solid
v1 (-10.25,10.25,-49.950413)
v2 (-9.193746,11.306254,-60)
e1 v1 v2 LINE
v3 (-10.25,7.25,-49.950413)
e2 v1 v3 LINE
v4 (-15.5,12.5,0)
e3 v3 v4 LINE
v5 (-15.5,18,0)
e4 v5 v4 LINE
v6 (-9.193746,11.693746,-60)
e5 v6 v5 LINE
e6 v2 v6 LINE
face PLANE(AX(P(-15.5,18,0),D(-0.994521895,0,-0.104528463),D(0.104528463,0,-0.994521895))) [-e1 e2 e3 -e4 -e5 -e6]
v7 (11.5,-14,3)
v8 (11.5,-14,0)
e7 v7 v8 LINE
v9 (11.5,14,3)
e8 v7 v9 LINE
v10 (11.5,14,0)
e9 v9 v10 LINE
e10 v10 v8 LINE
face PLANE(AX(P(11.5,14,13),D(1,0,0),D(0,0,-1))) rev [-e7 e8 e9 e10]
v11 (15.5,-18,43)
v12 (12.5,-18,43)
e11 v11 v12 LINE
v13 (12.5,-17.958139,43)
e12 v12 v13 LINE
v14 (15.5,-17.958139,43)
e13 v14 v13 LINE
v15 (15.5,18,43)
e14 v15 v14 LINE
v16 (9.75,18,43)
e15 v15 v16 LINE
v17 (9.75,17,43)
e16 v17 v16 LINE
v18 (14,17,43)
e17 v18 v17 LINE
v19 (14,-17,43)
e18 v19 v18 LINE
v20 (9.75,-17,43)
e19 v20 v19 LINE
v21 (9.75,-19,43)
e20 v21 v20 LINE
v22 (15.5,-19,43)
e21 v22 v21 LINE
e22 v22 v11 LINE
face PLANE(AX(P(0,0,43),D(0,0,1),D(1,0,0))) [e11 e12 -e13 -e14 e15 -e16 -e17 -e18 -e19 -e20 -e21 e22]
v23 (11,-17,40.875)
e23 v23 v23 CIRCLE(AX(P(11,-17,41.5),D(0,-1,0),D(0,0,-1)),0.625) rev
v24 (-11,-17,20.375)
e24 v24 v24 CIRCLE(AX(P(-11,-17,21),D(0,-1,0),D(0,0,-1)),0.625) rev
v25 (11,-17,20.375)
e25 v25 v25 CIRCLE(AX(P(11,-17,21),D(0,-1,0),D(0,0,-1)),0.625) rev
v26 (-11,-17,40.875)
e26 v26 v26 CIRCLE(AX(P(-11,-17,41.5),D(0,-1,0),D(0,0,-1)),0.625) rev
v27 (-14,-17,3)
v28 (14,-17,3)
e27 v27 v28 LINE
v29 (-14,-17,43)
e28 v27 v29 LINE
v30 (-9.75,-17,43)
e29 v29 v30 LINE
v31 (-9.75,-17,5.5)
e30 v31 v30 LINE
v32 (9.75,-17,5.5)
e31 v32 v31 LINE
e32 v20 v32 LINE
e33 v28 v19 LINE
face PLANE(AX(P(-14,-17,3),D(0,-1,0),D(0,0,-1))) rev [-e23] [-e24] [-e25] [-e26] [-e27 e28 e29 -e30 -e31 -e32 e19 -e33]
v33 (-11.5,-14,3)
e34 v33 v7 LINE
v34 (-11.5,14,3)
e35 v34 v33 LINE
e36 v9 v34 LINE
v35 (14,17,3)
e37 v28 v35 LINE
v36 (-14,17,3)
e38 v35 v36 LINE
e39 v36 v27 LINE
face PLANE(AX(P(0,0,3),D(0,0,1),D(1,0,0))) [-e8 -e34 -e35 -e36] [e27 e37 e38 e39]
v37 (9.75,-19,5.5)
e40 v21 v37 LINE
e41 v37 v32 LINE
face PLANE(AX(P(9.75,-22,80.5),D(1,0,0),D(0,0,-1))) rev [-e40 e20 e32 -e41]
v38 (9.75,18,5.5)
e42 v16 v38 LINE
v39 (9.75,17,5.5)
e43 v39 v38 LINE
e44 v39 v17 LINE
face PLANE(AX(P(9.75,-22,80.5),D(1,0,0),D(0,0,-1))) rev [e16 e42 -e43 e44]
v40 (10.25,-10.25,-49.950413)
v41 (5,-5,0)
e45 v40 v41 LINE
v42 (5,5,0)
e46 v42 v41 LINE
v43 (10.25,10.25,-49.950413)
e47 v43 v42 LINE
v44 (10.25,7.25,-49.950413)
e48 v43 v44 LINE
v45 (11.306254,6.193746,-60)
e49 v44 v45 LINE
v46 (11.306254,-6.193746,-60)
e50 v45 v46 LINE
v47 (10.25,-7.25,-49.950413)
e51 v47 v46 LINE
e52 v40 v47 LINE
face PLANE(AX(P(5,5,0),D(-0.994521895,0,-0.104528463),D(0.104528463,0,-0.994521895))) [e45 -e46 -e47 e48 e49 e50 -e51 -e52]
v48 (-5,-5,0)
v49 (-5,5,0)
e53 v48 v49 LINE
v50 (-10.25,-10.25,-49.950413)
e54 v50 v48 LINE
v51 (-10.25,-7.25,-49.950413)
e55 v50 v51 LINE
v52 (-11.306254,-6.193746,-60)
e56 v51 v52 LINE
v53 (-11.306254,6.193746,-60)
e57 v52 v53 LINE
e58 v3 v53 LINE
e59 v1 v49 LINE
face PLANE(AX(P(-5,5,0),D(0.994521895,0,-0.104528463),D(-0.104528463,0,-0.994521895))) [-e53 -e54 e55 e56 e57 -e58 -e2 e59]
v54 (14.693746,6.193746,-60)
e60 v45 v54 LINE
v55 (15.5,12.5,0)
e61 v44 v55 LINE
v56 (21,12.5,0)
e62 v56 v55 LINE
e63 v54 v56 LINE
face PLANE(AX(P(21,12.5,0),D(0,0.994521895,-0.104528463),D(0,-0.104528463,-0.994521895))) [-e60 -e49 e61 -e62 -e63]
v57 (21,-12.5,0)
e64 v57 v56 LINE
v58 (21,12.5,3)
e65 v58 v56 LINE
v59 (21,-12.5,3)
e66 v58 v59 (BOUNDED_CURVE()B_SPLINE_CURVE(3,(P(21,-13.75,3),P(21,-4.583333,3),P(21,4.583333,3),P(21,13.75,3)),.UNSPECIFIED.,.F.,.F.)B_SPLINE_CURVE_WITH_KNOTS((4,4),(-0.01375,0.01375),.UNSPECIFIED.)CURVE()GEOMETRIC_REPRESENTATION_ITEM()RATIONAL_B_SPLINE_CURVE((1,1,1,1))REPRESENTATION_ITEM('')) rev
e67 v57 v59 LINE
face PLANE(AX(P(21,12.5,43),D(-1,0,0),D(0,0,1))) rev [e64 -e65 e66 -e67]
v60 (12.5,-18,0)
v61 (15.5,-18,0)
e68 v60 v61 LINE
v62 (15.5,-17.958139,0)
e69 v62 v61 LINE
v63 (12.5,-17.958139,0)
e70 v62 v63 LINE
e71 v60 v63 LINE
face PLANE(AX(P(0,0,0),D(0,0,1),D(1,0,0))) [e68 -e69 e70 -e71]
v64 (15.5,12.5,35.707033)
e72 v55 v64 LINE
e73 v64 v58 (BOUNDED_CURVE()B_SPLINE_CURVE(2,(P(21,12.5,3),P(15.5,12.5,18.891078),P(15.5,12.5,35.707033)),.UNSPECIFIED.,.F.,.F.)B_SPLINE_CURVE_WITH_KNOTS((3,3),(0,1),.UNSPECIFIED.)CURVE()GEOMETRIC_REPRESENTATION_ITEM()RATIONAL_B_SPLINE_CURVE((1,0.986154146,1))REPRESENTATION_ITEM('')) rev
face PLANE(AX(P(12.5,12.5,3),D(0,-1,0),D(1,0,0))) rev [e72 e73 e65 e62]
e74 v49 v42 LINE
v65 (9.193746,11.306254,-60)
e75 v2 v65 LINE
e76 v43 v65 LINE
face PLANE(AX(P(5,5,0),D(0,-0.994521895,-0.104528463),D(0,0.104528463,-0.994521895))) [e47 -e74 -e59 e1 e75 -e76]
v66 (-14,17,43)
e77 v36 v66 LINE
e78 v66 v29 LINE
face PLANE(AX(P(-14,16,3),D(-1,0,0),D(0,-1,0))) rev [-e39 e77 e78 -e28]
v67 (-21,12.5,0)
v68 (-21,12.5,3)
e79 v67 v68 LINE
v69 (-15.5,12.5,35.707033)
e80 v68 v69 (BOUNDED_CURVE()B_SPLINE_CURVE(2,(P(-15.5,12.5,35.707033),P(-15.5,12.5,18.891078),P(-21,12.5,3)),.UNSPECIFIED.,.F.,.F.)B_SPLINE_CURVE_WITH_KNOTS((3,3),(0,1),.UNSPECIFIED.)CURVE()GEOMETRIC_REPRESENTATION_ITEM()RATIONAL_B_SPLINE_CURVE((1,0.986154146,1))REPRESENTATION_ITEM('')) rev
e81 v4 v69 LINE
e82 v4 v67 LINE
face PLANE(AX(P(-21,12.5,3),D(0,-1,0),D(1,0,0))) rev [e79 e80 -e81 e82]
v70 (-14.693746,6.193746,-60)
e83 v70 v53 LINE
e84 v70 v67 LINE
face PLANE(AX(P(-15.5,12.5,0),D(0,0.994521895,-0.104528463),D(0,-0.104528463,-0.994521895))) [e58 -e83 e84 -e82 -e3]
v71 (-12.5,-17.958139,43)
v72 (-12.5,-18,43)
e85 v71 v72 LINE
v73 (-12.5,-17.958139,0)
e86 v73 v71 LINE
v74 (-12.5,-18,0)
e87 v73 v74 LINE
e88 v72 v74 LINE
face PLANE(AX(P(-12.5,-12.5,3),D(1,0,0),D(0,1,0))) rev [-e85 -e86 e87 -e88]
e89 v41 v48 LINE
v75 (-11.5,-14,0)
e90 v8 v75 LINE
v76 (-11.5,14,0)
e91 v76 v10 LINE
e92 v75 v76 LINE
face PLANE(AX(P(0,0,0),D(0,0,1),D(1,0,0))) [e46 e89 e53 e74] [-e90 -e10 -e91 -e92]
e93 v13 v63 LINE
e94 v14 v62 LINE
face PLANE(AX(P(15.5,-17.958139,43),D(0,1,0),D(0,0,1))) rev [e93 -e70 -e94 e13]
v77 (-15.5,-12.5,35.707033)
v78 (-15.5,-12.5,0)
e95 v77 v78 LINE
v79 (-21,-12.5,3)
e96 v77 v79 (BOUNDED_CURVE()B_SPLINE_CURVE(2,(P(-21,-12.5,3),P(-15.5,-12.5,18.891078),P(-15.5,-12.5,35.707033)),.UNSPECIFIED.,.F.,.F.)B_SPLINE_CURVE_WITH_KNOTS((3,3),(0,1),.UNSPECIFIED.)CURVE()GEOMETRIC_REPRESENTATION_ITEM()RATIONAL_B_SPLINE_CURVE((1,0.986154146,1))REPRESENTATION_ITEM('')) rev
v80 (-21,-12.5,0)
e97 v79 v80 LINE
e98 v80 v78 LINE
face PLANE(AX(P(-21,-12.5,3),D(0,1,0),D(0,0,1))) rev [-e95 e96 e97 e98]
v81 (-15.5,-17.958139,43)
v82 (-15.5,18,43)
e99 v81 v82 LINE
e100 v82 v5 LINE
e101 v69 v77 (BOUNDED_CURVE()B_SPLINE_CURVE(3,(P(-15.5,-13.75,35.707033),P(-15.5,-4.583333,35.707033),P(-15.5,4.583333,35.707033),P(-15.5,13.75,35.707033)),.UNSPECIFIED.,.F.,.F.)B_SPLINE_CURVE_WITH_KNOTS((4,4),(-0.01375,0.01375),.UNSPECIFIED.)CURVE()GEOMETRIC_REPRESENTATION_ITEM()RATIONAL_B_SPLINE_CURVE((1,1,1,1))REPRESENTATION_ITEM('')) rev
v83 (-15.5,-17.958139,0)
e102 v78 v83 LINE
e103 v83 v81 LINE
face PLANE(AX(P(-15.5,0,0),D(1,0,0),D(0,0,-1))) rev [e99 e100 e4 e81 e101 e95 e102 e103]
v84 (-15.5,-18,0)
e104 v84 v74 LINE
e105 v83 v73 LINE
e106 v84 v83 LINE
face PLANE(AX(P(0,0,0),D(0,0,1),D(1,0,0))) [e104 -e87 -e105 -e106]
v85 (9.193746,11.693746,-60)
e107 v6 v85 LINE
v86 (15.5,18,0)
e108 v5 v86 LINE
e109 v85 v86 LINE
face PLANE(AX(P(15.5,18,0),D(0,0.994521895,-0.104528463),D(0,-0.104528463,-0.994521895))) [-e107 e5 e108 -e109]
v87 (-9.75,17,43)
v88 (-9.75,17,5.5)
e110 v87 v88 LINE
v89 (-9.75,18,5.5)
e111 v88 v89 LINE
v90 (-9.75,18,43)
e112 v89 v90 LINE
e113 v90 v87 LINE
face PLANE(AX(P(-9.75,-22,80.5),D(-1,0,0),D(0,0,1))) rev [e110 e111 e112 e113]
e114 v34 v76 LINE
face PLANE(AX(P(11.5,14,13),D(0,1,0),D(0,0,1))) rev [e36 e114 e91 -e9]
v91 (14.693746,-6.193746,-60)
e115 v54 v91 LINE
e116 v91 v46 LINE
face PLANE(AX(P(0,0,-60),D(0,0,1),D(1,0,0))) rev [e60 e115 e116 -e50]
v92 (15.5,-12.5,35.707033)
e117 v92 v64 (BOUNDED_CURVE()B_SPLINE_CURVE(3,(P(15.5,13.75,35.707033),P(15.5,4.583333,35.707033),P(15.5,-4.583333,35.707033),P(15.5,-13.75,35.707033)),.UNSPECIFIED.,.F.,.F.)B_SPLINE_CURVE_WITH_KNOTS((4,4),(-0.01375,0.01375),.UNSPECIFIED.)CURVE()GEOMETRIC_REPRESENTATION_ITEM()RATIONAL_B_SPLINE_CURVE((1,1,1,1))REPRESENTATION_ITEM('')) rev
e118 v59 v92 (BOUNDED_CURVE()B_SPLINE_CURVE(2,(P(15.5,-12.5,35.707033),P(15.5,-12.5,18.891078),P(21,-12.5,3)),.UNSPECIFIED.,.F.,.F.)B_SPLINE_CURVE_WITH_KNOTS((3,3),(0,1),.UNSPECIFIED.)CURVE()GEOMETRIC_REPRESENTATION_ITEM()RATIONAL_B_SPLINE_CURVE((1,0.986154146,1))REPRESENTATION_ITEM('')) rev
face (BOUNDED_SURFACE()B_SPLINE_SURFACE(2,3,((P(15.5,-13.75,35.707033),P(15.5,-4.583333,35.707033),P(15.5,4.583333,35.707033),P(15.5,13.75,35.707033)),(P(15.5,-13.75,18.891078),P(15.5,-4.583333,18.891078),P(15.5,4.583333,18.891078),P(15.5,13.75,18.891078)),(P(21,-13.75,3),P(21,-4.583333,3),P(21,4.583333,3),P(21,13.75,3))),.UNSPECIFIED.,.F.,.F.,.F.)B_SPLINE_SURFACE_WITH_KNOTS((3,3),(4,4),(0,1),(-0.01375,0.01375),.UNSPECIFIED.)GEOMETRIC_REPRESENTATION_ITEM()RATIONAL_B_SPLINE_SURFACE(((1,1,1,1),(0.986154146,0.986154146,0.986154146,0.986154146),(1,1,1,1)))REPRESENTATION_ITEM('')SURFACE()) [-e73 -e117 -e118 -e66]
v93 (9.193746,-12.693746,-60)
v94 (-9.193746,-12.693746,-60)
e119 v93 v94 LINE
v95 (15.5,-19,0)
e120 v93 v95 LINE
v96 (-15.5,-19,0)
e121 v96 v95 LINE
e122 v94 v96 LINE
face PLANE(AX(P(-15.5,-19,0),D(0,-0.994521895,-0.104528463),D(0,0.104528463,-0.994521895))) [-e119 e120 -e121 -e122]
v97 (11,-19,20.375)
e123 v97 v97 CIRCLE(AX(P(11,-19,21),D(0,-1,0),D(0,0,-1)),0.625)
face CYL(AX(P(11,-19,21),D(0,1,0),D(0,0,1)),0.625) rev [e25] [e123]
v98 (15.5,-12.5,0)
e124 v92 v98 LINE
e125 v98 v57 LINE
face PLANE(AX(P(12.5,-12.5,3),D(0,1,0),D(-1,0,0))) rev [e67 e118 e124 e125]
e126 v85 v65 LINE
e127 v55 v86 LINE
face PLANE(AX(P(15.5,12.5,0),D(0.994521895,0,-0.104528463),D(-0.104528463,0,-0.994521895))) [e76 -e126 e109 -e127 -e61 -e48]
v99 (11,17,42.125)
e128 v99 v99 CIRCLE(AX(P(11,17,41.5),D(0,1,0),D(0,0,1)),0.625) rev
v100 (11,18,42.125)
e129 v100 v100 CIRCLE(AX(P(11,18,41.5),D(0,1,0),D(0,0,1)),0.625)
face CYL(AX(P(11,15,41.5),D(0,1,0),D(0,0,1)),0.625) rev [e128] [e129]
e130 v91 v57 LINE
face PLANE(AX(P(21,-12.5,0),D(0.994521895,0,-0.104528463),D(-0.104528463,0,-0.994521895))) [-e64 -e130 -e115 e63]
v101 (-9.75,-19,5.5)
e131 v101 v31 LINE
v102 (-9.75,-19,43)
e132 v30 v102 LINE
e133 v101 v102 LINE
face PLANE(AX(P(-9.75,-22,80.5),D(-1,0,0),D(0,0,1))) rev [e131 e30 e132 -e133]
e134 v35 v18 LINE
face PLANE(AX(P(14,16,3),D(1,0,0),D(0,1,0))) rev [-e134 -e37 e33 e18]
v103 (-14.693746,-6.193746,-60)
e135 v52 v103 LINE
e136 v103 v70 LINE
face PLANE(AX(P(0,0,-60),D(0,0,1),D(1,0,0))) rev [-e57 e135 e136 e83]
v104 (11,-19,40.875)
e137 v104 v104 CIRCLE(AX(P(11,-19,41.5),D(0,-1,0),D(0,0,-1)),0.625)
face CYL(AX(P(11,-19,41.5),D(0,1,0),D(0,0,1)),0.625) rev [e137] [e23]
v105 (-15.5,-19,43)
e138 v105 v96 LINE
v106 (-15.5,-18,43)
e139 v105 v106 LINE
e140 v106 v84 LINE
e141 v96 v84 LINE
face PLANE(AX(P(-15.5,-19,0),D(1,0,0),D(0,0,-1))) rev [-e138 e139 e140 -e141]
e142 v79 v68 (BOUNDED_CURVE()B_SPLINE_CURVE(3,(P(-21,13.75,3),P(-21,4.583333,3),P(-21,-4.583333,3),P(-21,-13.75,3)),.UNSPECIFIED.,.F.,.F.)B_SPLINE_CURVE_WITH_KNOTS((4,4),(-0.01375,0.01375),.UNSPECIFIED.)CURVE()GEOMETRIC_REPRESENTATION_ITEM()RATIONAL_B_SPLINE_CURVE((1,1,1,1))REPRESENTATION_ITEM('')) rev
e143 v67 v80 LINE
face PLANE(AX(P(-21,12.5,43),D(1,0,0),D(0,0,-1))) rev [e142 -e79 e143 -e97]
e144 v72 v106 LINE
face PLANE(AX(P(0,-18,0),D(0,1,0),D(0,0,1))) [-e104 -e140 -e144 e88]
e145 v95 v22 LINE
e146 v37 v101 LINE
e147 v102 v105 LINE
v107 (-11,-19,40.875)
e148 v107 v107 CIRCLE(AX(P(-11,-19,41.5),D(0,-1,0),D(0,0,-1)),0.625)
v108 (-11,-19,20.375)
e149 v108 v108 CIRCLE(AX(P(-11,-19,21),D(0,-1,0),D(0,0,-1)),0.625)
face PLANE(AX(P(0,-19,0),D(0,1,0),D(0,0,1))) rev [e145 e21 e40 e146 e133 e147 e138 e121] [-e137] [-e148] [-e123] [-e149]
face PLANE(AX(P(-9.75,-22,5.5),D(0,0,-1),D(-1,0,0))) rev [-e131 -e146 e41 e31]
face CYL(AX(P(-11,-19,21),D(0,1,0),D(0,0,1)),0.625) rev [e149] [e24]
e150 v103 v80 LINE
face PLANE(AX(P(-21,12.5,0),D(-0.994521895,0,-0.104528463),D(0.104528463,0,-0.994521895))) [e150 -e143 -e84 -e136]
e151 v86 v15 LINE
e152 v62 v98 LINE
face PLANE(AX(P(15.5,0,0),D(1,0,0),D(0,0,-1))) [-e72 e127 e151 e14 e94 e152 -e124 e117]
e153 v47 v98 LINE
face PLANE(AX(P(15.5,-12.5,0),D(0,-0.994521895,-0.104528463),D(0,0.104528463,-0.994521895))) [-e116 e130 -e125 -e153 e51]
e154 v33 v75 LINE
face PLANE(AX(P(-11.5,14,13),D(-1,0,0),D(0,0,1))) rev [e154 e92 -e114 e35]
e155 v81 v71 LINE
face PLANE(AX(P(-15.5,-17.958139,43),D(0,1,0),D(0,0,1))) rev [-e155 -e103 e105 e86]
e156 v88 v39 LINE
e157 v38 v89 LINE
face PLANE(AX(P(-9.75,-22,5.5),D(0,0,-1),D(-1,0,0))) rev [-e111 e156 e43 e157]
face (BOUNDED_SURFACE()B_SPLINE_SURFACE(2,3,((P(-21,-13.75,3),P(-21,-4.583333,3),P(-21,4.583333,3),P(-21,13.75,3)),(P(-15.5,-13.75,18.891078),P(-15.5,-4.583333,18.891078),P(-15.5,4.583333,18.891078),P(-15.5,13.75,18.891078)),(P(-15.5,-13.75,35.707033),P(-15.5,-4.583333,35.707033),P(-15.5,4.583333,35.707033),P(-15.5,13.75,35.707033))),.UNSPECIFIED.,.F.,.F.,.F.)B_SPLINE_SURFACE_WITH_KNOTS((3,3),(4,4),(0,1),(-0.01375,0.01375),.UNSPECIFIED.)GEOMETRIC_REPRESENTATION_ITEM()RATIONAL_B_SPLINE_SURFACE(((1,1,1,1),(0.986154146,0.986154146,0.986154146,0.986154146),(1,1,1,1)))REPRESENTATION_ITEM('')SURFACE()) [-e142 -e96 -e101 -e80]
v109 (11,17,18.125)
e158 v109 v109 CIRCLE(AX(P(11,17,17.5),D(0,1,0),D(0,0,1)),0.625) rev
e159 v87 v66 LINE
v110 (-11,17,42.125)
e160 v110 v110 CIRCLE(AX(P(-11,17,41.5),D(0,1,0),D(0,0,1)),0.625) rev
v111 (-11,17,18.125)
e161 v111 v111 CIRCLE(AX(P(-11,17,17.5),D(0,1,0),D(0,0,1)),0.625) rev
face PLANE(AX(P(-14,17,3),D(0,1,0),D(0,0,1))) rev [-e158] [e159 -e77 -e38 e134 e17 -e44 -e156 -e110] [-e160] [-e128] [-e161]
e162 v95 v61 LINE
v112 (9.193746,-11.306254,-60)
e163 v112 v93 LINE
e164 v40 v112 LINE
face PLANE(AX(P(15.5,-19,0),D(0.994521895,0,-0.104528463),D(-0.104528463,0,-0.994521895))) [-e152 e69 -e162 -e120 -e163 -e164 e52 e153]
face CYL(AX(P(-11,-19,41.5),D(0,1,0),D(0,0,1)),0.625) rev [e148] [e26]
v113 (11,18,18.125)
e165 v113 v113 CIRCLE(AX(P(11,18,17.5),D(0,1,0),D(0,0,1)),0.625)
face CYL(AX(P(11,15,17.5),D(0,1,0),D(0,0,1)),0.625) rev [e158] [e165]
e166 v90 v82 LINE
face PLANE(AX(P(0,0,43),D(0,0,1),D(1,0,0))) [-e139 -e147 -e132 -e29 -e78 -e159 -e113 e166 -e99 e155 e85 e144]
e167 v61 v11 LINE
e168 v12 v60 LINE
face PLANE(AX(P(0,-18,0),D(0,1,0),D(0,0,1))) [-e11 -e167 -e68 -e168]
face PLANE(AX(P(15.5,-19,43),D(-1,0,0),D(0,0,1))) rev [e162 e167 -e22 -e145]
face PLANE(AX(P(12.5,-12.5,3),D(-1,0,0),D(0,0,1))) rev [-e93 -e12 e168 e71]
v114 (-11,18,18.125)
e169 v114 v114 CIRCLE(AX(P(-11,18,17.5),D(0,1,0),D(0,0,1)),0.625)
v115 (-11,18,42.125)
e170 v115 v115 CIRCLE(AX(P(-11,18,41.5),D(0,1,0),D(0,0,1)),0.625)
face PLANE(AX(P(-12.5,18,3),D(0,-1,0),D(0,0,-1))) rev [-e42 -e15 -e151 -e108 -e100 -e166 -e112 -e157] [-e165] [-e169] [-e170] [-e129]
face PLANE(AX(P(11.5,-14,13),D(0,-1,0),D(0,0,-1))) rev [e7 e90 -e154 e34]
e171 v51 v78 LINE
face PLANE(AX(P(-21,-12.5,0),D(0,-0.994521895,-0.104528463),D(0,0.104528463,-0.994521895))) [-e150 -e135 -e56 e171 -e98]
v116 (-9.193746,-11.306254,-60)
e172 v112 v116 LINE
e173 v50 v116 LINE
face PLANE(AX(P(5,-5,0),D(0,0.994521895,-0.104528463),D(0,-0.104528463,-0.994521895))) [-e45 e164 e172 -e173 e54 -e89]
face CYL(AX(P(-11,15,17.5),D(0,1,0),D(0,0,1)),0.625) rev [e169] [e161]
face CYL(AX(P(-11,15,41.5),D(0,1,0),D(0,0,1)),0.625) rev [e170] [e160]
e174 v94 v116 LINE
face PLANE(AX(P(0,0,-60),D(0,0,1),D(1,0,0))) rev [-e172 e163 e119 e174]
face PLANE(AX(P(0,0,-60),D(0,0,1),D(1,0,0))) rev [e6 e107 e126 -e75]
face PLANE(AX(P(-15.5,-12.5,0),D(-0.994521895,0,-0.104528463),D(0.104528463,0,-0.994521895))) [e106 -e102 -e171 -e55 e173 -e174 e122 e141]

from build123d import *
from build123d.topology import SkipClean

# Parameters (mm, degrees)
BOSS_EXTRUDE1_DEPTH      = 3
SKETCH2_W                = 25
SKETCH2_H                = 2
BOSS_EXTRUDE2_DEPTH      = 40
SKETCH3_R                = 0.625
CUT_EXTRUDE1_DEPTH       = 3
SKETCH4_R                = 0.625
CUT_EXTRUDE2_DEPTH       = 3
SKETCH7_W                = 19.5
SKETCH7_H                = 75
CUT_EXTRUDE5_DEPTH       = 40
SKETCH10_W               = 25
SKETCH10_H               = 3
BOSS_EXTRUDE4_DEPTH      = 10
SKETCH11_W               = 25
SKETCH11_H               = 3
BOSS_EXTRUDE5_DEPTH      = 10
SKETCH12_W               = 3
SKETCH12_H               = 25
BOSS_EXTRUDE6_DEPTH      = 10
SKETCH13_W               = 3
SKETCH13_H               = 25
BOSS_EXTRUDE7_DEPTH      = 10
SKETCH14_W               = 43
SKETCH14_H               = 35.95813892
BOSS_EXTRUDE11_DEPTH     = 3
SKETCH15_W               = 43
SKETCH15_H               = 35.95813892
BOSS_EXTRUDE12_DEPTH     = 3
SKETCH16_W               = 23
SKETCH16_H               = 28
CUT_EXTRUDE6_DEPTH       = 13
FILLET1_R                = 10
FILLET2_R                = 10
SKETCH19_W               = 28
SKETCH19_H               = 32
CUT_EXTRUDE9_DEPTH       = 40
CUT_EXTRUDE11_DEPTH      = 58.835974964
CUT_EXTRUDE11_DEPTH_BACK = 58.835974964
SKETCH20_W               = 25.25
SKETCH20_H               = 11.847644437
SKETCH20_W_2             = 25
SKETCH20_H_2             = 13.837487399
CUT_EXTRUDE13_DEPTH      = 56.982140009
CUT_EXTRUDE13_DEPTH_BACK = 56.982140009
SKETCH22_W               = 10
SKETCH22_H               = 25
FILLET3_R                = 100
FILLET4_R                = 100
SKETCH25_W               = 28
SKETCH25_H               = 2
CUT_EXTRUDE17_DEPTH      = 40
SKETCH27_R               = 0.625
BOSS_EXTRUDE14_DEPTH     = 1
SKETCH31_W               = 10
SKETCH31_H               = 10
BOSS_EXTRUDE16_DEPTH     = 60
BOSS_EXTRUDE16_TAPER     = 6


# Some blends are built 0.0001 mm under size
with BuildPart() as part:
    # Sketch1 → Boss-Extrude1 (new body)
    with BuildSketch(Plane.XY):
        Polygon((12.5, 12.5), (21, 12.5), (21, -12.5), (12.5, -12.5), (12.5, -18), (-12.5, -18), (-12.5, -12.5), (-21, -12.5), (-21, 12.5), (-12.5, 12.5), (-12.5, 18), (12.5, 18), align=None)
    extrude(amount=BOSS_EXTRUDE1_DEPTH)

    # Sketch2 → Boss-Extrude2 (add)
    with BuildSketch(Plane.XY.offset(3)):
        with Locations((0, 17)):
            Rectangle(SKETCH2_W, SKETCH2_H)
        with Locations((0, -17)):
            Rectangle(SKETCH2_W, SKETCH2_H)
    extrude(amount=BOSS_EXTRUDE2_DEPTH)

    # Sketch3 → Cut-Extrude1 (cut)
    with BuildSketch(Plane(origin=(0, 18, 0), x_dir=(1, 0, 0), z_dir=(0, 1, 0))):
        with Locations(Location((-11, -17.5, 0), (0, 0, 270))):
            Circle(SKETCH3_R)
        with Locations(Location((11, -17.5, 0), (0, 0, 270))):
            Circle(SKETCH3_R)
        with Locations(Location((-11, -41.5, 0), (0, 0, 270))):
            Circle(SKETCH3_R)
        with Locations(Location((11, -41.5, 0), (0, 0, 270))):
            Circle(SKETCH3_R)
    extrude(amount=-CUT_EXTRUDE1_DEPTH, mode=Mode.SUBTRACT)

    # Sketch4 → Cut-Extrude2 (cut)
    with BuildSketch(Plane(origin=(0, -16, 0), x_dir=(1, 0, 0), z_dir=(0, 1, 0))):
        with Locations(Location((-11, -41.5, 0), (0, 0, 270))):
            Circle(SKETCH4_R)
        with Locations(Location((11, -41.5, 0), (0, 0, 270))):
            Circle(SKETCH4_R)
        with Locations(Location((-11, -21, 0), (0, 0, 270))):
            Circle(SKETCH4_R)
        with Locations(Location((11, -21, 0), (0, 0, 270))):
            Circle(SKETCH4_R)
    extrude(amount=-CUT_EXTRUDE2_DEPTH, mode=Mode.SUBTRACT)

    # Sketch7 → Cut-Extrude5 (cut)
    with BuildSketch(Plane(origin=(0, 18, 0), x_dir=(1, 0, 0), z_dir=(0, 1, 0))):
        with Locations((0, -43)):
            Rectangle(SKETCH7_W, SKETCH7_H)
    extrude(amount=-CUT_EXTRUDE5_DEPTH, mode=Mode.SUBTRACT)

    # Sketch10 → Boss-Extrude4 (add)
    with BuildSketch(Plane(origin=(0, 18, 0), x_dir=(1, 0, 0), z_dir=(0, 1, 0))):
        with Locations((0, -1.5)):
            Rectangle(SKETCH10_W, SKETCH10_H)
    extrude(amount=BOSS_EXTRUDE4_DEPTH)

    # Sketch11 → Boss-Extrude5 (add)
    with BuildSketch(Plane.XZ.offset(18)):
        with Locations((0, 1.5)):
            Rectangle(SKETCH11_W, SKETCH11_H)
    extrude(amount=BOSS_EXTRUDE5_DEPTH)

    # Sketch12 → Boss-Extrude6 (add)
    with BuildSketch(Plane.ZY.offset(21)):
        with Locations((1.5, 0)):
            Rectangle(SKETCH12_W, SKETCH12_H)
    extrude(amount=BOSS_EXTRUDE6_DEPTH)

    # Sketch13 → Boss-Extrude7 (add)
    with BuildSketch(Plane(origin=(21, 0, 0), x_dir=(0, 0, -1), z_dir=(1, 0, 0))):
        with Locations((-1.5, 0)):
            Rectangle(SKETCH13_W, SKETCH13_H)
    extrude(amount=BOSS_EXTRUDE7_DEPTH)

    # Sketch14 → Boss-Extrude11 (add)
    with BuildSketch(Plane.ZY.offset(12.5)):
        with Locations((21.5, 0.02093054)):
            Rectangle(SKETCH14_W, SKETCH14_H)
    extrude(amount=BOSS_EXTRUDE11_DEPTH)

    # Sketch15 → Boss-Extrude12 (add)
    with BuildSketch(Plane(origin=(12.5, 0, 0), x_dir=(0, 0, -1), z_dir=(1, 0, 0))):
        with Locations((-21.5, 0.02093054)):
            Rectangle(SKETCH15_W, SKETCH15_H)
    extrude(amount=BOSS_EXTRUDE12_DEPTH)

    # Sketch16 → Cut-Extrude6 (cut)
    with BuildSketch(Plane(origin=(0, 0, 0), x_dir=(-1, 0, 0), z_dir=(0, 0, -1))):
        Rectangle(SKETCH16_W, SKETCH16_H)
    extrude(amount=-CUT_EXTRUDE6_DEPTH, mode=Mode.SUBTRACT)

    # Fillet1
    fillet1_edges = [part.edges().sort_by_distance(p)[0] for p in [
        (31, 12.5, 1.5),
    ]]
    fillet(fillet1_edges, radius=FILLET1_R)

    # Fillet2
    fillet2_edges = [part.edges().sort_by_distance(p)[0] for p in [
        (12.5, 28, 1.5),
        (-12.5, 28, 1.5),
        (-31, 12.5, 1.5),
        (12.5, -28, 1.5),
        (-31, -12.5, 1.5),
        (-12.5, -28, 1.5),
        (31, -12.5, 1.5),
    ]]
    fillet(fillet2_edges, radius=FILLET2_R - 0.0001)  # a hair under: the kernel refuses the full size

    # Sketch19 → Cut-Extrude9 (cut)
    with BuildSketch(Plane.XY.offset(43)):
        Rectangle(SKETCH19_W, SKETCH19_H)
    extrude(amount=-CUT_EXTRUDE9_DEPTH, mode=Mode.SUBTRACT)

    # Sketch20 → Cut-Extrude11 (cut, two sides: drawn at the far end of the back side and taken through both)
    with BuildSketch(Plane.XY.offset(3).offset(-CUT_EXTRUDE11_DEPTH_BACK)):
        with Locations((0, 23.923822218)):
            Rectangle(SKETCH20_W, SKETCH20_H)
        with Locations((0, -24.918743699)):
            Rectangle(SKETCH20_W_2, SKETCH20_H_2)
    extrude(amount=CUT_EXTRUDE11_DEPTH + CUT_EXTRUDE11_DEPTH_BACK, mode=Mode.SUBTRACT)

    # Sketch22 → Cut-Extrude13 (cut, two sides: drawn at the far end of the back side and taken through both)
    with BuildSketch(Plane(origin=(0, 0, 0), x_dir=(-1, 0, 0), z_dir=(0, 0, -1)).offset(-CUT_EXTRUDE13_DEPTH_BACK)):
        with Locations((26, 0)):
            Rectangle(SKETCH22_W, SKETCH22_H)
        with Locations((-26, 0)):
            Rectangle(SKETCH22_W, SKETCH22_H)
    extrude(amount=CUT_EXTRUDE13_DEPTH + CUT_EXTRUDE13_DEPTH_BACK, mode=Mode.SUBTRACT)

    # Fillet3
    # the kernel refuses this fillet: 100 mm, written as the material it adds along each edge
    with BuildSketch(Plane(origin=(-15.5, -12.5, 3), x_dir=(0, 0, 1), z_dir=(0, 1, 0))) as fillet3_piece_1:
        with BuildLine():
            CenterArc((32.707032883, -100), FILLET3_R, 90, 19.091052513)
            Line((0, -5.5), (0, 0))
            Line((0, 0), (32.707032883, 0))
        make_face()
    extrude(amount=25)

    # Fillet4
    # the kernel refuses this fillet: 100 mm, written as the material it adds along each edge
    with BuildSketch(Plane(origin=(15.5, -12.5, 3), x_dir=(1, 0, 0), z_dir=(0, 1, 0))) as fillet4_piece_1:
        with BuildLine():
            CenterArc((100, -32.707032883), FILLET4_R, 160.908947487, 19.091052513)
            Line((0, -32.707032883), (0, 0))
            Line((0, 0), (5.5, 0))
        make_face()
    extrude(amount=25)

    # Sketch25 → Cut-Extrude17 (cut)
    with BuildSketch(Plane.XY.offset(43)):
        with Locations((0, 16)):
            Rectangle(SKETCH25_W, SKETCH25_H)
        with Locations((0, -16)):
            Rectangle(SKETCH25_W, SKETCH25_H)
    extrude(amount=-CUT_EXTRUDE17_DEPTH, mode=Mode.SUBTRACT)

    # Sketch27 → Boss-Extrude14 (add)
    with SkipClean():  # the faces are left unmerged after this step: merging them gives an invalid solid
        with BuildSketch(Plane.XZ.offset(18)):
            Polygon((-15.5, 43), (-9.75, 43), (-9.75, 5.5), (9.75, 5.5), (9.75, 43), (15.5, 43), (15.5, 0), (-15.5, 0), align=None)
            with Locations(Location((-11, 41.5, 0), (0, 0, 90))):
                Circle(SKETCH27_R, mode=Mode.SUBTRACT)
            with Locations(Location((-11, 21, 0), (0, 0, 270))):
                Circle(SKETCH27_R, mode=Mode.SUBTRACT)
            with Locations(Location((11, 21, 0), (0, 0, 270))):
                Circle(SKETCH27_R, mode=Mode.SUBTRACT)
            with Locations(Location((11, 41.5, 0), (0, 0, 90))):
                Circle(SKETCH27_R, mode=Mode.SUBTRACT)
        extrude(amount=BOSS_EXTRUDE14_DEPTH)
    add(part.part.scale(1), mode=Mode.REPLACE)  # the faces are merged on a copy

    # Sketch31 → Boss-Extrude16 (add)
    with BuildSketch(Plane(origin=(0, 0, 0), x_dir=(-1, 0, 0), z_dir=(0, 0, -1))):
        Polygon((-15.5, 18), (-15.5, 12.5), (-21, 12.5), (-21, -12.5), (-15.5, -12.5), (-15.5, -19), (15.5, -19), (15.5, -12.5), (21, -12.5), (21, 12.5), (15.5, 12.5), (15.5, 18), align=None)
        Rectangle(SKETCH31_W, SKETCH31_H, mode=Mode.SUBTRACT)
    extrude(amount=BOSS_EXTRUDE16_DEPTH, taper=BOSS_EXTRUDE16_TAPER)


solid = part.part
